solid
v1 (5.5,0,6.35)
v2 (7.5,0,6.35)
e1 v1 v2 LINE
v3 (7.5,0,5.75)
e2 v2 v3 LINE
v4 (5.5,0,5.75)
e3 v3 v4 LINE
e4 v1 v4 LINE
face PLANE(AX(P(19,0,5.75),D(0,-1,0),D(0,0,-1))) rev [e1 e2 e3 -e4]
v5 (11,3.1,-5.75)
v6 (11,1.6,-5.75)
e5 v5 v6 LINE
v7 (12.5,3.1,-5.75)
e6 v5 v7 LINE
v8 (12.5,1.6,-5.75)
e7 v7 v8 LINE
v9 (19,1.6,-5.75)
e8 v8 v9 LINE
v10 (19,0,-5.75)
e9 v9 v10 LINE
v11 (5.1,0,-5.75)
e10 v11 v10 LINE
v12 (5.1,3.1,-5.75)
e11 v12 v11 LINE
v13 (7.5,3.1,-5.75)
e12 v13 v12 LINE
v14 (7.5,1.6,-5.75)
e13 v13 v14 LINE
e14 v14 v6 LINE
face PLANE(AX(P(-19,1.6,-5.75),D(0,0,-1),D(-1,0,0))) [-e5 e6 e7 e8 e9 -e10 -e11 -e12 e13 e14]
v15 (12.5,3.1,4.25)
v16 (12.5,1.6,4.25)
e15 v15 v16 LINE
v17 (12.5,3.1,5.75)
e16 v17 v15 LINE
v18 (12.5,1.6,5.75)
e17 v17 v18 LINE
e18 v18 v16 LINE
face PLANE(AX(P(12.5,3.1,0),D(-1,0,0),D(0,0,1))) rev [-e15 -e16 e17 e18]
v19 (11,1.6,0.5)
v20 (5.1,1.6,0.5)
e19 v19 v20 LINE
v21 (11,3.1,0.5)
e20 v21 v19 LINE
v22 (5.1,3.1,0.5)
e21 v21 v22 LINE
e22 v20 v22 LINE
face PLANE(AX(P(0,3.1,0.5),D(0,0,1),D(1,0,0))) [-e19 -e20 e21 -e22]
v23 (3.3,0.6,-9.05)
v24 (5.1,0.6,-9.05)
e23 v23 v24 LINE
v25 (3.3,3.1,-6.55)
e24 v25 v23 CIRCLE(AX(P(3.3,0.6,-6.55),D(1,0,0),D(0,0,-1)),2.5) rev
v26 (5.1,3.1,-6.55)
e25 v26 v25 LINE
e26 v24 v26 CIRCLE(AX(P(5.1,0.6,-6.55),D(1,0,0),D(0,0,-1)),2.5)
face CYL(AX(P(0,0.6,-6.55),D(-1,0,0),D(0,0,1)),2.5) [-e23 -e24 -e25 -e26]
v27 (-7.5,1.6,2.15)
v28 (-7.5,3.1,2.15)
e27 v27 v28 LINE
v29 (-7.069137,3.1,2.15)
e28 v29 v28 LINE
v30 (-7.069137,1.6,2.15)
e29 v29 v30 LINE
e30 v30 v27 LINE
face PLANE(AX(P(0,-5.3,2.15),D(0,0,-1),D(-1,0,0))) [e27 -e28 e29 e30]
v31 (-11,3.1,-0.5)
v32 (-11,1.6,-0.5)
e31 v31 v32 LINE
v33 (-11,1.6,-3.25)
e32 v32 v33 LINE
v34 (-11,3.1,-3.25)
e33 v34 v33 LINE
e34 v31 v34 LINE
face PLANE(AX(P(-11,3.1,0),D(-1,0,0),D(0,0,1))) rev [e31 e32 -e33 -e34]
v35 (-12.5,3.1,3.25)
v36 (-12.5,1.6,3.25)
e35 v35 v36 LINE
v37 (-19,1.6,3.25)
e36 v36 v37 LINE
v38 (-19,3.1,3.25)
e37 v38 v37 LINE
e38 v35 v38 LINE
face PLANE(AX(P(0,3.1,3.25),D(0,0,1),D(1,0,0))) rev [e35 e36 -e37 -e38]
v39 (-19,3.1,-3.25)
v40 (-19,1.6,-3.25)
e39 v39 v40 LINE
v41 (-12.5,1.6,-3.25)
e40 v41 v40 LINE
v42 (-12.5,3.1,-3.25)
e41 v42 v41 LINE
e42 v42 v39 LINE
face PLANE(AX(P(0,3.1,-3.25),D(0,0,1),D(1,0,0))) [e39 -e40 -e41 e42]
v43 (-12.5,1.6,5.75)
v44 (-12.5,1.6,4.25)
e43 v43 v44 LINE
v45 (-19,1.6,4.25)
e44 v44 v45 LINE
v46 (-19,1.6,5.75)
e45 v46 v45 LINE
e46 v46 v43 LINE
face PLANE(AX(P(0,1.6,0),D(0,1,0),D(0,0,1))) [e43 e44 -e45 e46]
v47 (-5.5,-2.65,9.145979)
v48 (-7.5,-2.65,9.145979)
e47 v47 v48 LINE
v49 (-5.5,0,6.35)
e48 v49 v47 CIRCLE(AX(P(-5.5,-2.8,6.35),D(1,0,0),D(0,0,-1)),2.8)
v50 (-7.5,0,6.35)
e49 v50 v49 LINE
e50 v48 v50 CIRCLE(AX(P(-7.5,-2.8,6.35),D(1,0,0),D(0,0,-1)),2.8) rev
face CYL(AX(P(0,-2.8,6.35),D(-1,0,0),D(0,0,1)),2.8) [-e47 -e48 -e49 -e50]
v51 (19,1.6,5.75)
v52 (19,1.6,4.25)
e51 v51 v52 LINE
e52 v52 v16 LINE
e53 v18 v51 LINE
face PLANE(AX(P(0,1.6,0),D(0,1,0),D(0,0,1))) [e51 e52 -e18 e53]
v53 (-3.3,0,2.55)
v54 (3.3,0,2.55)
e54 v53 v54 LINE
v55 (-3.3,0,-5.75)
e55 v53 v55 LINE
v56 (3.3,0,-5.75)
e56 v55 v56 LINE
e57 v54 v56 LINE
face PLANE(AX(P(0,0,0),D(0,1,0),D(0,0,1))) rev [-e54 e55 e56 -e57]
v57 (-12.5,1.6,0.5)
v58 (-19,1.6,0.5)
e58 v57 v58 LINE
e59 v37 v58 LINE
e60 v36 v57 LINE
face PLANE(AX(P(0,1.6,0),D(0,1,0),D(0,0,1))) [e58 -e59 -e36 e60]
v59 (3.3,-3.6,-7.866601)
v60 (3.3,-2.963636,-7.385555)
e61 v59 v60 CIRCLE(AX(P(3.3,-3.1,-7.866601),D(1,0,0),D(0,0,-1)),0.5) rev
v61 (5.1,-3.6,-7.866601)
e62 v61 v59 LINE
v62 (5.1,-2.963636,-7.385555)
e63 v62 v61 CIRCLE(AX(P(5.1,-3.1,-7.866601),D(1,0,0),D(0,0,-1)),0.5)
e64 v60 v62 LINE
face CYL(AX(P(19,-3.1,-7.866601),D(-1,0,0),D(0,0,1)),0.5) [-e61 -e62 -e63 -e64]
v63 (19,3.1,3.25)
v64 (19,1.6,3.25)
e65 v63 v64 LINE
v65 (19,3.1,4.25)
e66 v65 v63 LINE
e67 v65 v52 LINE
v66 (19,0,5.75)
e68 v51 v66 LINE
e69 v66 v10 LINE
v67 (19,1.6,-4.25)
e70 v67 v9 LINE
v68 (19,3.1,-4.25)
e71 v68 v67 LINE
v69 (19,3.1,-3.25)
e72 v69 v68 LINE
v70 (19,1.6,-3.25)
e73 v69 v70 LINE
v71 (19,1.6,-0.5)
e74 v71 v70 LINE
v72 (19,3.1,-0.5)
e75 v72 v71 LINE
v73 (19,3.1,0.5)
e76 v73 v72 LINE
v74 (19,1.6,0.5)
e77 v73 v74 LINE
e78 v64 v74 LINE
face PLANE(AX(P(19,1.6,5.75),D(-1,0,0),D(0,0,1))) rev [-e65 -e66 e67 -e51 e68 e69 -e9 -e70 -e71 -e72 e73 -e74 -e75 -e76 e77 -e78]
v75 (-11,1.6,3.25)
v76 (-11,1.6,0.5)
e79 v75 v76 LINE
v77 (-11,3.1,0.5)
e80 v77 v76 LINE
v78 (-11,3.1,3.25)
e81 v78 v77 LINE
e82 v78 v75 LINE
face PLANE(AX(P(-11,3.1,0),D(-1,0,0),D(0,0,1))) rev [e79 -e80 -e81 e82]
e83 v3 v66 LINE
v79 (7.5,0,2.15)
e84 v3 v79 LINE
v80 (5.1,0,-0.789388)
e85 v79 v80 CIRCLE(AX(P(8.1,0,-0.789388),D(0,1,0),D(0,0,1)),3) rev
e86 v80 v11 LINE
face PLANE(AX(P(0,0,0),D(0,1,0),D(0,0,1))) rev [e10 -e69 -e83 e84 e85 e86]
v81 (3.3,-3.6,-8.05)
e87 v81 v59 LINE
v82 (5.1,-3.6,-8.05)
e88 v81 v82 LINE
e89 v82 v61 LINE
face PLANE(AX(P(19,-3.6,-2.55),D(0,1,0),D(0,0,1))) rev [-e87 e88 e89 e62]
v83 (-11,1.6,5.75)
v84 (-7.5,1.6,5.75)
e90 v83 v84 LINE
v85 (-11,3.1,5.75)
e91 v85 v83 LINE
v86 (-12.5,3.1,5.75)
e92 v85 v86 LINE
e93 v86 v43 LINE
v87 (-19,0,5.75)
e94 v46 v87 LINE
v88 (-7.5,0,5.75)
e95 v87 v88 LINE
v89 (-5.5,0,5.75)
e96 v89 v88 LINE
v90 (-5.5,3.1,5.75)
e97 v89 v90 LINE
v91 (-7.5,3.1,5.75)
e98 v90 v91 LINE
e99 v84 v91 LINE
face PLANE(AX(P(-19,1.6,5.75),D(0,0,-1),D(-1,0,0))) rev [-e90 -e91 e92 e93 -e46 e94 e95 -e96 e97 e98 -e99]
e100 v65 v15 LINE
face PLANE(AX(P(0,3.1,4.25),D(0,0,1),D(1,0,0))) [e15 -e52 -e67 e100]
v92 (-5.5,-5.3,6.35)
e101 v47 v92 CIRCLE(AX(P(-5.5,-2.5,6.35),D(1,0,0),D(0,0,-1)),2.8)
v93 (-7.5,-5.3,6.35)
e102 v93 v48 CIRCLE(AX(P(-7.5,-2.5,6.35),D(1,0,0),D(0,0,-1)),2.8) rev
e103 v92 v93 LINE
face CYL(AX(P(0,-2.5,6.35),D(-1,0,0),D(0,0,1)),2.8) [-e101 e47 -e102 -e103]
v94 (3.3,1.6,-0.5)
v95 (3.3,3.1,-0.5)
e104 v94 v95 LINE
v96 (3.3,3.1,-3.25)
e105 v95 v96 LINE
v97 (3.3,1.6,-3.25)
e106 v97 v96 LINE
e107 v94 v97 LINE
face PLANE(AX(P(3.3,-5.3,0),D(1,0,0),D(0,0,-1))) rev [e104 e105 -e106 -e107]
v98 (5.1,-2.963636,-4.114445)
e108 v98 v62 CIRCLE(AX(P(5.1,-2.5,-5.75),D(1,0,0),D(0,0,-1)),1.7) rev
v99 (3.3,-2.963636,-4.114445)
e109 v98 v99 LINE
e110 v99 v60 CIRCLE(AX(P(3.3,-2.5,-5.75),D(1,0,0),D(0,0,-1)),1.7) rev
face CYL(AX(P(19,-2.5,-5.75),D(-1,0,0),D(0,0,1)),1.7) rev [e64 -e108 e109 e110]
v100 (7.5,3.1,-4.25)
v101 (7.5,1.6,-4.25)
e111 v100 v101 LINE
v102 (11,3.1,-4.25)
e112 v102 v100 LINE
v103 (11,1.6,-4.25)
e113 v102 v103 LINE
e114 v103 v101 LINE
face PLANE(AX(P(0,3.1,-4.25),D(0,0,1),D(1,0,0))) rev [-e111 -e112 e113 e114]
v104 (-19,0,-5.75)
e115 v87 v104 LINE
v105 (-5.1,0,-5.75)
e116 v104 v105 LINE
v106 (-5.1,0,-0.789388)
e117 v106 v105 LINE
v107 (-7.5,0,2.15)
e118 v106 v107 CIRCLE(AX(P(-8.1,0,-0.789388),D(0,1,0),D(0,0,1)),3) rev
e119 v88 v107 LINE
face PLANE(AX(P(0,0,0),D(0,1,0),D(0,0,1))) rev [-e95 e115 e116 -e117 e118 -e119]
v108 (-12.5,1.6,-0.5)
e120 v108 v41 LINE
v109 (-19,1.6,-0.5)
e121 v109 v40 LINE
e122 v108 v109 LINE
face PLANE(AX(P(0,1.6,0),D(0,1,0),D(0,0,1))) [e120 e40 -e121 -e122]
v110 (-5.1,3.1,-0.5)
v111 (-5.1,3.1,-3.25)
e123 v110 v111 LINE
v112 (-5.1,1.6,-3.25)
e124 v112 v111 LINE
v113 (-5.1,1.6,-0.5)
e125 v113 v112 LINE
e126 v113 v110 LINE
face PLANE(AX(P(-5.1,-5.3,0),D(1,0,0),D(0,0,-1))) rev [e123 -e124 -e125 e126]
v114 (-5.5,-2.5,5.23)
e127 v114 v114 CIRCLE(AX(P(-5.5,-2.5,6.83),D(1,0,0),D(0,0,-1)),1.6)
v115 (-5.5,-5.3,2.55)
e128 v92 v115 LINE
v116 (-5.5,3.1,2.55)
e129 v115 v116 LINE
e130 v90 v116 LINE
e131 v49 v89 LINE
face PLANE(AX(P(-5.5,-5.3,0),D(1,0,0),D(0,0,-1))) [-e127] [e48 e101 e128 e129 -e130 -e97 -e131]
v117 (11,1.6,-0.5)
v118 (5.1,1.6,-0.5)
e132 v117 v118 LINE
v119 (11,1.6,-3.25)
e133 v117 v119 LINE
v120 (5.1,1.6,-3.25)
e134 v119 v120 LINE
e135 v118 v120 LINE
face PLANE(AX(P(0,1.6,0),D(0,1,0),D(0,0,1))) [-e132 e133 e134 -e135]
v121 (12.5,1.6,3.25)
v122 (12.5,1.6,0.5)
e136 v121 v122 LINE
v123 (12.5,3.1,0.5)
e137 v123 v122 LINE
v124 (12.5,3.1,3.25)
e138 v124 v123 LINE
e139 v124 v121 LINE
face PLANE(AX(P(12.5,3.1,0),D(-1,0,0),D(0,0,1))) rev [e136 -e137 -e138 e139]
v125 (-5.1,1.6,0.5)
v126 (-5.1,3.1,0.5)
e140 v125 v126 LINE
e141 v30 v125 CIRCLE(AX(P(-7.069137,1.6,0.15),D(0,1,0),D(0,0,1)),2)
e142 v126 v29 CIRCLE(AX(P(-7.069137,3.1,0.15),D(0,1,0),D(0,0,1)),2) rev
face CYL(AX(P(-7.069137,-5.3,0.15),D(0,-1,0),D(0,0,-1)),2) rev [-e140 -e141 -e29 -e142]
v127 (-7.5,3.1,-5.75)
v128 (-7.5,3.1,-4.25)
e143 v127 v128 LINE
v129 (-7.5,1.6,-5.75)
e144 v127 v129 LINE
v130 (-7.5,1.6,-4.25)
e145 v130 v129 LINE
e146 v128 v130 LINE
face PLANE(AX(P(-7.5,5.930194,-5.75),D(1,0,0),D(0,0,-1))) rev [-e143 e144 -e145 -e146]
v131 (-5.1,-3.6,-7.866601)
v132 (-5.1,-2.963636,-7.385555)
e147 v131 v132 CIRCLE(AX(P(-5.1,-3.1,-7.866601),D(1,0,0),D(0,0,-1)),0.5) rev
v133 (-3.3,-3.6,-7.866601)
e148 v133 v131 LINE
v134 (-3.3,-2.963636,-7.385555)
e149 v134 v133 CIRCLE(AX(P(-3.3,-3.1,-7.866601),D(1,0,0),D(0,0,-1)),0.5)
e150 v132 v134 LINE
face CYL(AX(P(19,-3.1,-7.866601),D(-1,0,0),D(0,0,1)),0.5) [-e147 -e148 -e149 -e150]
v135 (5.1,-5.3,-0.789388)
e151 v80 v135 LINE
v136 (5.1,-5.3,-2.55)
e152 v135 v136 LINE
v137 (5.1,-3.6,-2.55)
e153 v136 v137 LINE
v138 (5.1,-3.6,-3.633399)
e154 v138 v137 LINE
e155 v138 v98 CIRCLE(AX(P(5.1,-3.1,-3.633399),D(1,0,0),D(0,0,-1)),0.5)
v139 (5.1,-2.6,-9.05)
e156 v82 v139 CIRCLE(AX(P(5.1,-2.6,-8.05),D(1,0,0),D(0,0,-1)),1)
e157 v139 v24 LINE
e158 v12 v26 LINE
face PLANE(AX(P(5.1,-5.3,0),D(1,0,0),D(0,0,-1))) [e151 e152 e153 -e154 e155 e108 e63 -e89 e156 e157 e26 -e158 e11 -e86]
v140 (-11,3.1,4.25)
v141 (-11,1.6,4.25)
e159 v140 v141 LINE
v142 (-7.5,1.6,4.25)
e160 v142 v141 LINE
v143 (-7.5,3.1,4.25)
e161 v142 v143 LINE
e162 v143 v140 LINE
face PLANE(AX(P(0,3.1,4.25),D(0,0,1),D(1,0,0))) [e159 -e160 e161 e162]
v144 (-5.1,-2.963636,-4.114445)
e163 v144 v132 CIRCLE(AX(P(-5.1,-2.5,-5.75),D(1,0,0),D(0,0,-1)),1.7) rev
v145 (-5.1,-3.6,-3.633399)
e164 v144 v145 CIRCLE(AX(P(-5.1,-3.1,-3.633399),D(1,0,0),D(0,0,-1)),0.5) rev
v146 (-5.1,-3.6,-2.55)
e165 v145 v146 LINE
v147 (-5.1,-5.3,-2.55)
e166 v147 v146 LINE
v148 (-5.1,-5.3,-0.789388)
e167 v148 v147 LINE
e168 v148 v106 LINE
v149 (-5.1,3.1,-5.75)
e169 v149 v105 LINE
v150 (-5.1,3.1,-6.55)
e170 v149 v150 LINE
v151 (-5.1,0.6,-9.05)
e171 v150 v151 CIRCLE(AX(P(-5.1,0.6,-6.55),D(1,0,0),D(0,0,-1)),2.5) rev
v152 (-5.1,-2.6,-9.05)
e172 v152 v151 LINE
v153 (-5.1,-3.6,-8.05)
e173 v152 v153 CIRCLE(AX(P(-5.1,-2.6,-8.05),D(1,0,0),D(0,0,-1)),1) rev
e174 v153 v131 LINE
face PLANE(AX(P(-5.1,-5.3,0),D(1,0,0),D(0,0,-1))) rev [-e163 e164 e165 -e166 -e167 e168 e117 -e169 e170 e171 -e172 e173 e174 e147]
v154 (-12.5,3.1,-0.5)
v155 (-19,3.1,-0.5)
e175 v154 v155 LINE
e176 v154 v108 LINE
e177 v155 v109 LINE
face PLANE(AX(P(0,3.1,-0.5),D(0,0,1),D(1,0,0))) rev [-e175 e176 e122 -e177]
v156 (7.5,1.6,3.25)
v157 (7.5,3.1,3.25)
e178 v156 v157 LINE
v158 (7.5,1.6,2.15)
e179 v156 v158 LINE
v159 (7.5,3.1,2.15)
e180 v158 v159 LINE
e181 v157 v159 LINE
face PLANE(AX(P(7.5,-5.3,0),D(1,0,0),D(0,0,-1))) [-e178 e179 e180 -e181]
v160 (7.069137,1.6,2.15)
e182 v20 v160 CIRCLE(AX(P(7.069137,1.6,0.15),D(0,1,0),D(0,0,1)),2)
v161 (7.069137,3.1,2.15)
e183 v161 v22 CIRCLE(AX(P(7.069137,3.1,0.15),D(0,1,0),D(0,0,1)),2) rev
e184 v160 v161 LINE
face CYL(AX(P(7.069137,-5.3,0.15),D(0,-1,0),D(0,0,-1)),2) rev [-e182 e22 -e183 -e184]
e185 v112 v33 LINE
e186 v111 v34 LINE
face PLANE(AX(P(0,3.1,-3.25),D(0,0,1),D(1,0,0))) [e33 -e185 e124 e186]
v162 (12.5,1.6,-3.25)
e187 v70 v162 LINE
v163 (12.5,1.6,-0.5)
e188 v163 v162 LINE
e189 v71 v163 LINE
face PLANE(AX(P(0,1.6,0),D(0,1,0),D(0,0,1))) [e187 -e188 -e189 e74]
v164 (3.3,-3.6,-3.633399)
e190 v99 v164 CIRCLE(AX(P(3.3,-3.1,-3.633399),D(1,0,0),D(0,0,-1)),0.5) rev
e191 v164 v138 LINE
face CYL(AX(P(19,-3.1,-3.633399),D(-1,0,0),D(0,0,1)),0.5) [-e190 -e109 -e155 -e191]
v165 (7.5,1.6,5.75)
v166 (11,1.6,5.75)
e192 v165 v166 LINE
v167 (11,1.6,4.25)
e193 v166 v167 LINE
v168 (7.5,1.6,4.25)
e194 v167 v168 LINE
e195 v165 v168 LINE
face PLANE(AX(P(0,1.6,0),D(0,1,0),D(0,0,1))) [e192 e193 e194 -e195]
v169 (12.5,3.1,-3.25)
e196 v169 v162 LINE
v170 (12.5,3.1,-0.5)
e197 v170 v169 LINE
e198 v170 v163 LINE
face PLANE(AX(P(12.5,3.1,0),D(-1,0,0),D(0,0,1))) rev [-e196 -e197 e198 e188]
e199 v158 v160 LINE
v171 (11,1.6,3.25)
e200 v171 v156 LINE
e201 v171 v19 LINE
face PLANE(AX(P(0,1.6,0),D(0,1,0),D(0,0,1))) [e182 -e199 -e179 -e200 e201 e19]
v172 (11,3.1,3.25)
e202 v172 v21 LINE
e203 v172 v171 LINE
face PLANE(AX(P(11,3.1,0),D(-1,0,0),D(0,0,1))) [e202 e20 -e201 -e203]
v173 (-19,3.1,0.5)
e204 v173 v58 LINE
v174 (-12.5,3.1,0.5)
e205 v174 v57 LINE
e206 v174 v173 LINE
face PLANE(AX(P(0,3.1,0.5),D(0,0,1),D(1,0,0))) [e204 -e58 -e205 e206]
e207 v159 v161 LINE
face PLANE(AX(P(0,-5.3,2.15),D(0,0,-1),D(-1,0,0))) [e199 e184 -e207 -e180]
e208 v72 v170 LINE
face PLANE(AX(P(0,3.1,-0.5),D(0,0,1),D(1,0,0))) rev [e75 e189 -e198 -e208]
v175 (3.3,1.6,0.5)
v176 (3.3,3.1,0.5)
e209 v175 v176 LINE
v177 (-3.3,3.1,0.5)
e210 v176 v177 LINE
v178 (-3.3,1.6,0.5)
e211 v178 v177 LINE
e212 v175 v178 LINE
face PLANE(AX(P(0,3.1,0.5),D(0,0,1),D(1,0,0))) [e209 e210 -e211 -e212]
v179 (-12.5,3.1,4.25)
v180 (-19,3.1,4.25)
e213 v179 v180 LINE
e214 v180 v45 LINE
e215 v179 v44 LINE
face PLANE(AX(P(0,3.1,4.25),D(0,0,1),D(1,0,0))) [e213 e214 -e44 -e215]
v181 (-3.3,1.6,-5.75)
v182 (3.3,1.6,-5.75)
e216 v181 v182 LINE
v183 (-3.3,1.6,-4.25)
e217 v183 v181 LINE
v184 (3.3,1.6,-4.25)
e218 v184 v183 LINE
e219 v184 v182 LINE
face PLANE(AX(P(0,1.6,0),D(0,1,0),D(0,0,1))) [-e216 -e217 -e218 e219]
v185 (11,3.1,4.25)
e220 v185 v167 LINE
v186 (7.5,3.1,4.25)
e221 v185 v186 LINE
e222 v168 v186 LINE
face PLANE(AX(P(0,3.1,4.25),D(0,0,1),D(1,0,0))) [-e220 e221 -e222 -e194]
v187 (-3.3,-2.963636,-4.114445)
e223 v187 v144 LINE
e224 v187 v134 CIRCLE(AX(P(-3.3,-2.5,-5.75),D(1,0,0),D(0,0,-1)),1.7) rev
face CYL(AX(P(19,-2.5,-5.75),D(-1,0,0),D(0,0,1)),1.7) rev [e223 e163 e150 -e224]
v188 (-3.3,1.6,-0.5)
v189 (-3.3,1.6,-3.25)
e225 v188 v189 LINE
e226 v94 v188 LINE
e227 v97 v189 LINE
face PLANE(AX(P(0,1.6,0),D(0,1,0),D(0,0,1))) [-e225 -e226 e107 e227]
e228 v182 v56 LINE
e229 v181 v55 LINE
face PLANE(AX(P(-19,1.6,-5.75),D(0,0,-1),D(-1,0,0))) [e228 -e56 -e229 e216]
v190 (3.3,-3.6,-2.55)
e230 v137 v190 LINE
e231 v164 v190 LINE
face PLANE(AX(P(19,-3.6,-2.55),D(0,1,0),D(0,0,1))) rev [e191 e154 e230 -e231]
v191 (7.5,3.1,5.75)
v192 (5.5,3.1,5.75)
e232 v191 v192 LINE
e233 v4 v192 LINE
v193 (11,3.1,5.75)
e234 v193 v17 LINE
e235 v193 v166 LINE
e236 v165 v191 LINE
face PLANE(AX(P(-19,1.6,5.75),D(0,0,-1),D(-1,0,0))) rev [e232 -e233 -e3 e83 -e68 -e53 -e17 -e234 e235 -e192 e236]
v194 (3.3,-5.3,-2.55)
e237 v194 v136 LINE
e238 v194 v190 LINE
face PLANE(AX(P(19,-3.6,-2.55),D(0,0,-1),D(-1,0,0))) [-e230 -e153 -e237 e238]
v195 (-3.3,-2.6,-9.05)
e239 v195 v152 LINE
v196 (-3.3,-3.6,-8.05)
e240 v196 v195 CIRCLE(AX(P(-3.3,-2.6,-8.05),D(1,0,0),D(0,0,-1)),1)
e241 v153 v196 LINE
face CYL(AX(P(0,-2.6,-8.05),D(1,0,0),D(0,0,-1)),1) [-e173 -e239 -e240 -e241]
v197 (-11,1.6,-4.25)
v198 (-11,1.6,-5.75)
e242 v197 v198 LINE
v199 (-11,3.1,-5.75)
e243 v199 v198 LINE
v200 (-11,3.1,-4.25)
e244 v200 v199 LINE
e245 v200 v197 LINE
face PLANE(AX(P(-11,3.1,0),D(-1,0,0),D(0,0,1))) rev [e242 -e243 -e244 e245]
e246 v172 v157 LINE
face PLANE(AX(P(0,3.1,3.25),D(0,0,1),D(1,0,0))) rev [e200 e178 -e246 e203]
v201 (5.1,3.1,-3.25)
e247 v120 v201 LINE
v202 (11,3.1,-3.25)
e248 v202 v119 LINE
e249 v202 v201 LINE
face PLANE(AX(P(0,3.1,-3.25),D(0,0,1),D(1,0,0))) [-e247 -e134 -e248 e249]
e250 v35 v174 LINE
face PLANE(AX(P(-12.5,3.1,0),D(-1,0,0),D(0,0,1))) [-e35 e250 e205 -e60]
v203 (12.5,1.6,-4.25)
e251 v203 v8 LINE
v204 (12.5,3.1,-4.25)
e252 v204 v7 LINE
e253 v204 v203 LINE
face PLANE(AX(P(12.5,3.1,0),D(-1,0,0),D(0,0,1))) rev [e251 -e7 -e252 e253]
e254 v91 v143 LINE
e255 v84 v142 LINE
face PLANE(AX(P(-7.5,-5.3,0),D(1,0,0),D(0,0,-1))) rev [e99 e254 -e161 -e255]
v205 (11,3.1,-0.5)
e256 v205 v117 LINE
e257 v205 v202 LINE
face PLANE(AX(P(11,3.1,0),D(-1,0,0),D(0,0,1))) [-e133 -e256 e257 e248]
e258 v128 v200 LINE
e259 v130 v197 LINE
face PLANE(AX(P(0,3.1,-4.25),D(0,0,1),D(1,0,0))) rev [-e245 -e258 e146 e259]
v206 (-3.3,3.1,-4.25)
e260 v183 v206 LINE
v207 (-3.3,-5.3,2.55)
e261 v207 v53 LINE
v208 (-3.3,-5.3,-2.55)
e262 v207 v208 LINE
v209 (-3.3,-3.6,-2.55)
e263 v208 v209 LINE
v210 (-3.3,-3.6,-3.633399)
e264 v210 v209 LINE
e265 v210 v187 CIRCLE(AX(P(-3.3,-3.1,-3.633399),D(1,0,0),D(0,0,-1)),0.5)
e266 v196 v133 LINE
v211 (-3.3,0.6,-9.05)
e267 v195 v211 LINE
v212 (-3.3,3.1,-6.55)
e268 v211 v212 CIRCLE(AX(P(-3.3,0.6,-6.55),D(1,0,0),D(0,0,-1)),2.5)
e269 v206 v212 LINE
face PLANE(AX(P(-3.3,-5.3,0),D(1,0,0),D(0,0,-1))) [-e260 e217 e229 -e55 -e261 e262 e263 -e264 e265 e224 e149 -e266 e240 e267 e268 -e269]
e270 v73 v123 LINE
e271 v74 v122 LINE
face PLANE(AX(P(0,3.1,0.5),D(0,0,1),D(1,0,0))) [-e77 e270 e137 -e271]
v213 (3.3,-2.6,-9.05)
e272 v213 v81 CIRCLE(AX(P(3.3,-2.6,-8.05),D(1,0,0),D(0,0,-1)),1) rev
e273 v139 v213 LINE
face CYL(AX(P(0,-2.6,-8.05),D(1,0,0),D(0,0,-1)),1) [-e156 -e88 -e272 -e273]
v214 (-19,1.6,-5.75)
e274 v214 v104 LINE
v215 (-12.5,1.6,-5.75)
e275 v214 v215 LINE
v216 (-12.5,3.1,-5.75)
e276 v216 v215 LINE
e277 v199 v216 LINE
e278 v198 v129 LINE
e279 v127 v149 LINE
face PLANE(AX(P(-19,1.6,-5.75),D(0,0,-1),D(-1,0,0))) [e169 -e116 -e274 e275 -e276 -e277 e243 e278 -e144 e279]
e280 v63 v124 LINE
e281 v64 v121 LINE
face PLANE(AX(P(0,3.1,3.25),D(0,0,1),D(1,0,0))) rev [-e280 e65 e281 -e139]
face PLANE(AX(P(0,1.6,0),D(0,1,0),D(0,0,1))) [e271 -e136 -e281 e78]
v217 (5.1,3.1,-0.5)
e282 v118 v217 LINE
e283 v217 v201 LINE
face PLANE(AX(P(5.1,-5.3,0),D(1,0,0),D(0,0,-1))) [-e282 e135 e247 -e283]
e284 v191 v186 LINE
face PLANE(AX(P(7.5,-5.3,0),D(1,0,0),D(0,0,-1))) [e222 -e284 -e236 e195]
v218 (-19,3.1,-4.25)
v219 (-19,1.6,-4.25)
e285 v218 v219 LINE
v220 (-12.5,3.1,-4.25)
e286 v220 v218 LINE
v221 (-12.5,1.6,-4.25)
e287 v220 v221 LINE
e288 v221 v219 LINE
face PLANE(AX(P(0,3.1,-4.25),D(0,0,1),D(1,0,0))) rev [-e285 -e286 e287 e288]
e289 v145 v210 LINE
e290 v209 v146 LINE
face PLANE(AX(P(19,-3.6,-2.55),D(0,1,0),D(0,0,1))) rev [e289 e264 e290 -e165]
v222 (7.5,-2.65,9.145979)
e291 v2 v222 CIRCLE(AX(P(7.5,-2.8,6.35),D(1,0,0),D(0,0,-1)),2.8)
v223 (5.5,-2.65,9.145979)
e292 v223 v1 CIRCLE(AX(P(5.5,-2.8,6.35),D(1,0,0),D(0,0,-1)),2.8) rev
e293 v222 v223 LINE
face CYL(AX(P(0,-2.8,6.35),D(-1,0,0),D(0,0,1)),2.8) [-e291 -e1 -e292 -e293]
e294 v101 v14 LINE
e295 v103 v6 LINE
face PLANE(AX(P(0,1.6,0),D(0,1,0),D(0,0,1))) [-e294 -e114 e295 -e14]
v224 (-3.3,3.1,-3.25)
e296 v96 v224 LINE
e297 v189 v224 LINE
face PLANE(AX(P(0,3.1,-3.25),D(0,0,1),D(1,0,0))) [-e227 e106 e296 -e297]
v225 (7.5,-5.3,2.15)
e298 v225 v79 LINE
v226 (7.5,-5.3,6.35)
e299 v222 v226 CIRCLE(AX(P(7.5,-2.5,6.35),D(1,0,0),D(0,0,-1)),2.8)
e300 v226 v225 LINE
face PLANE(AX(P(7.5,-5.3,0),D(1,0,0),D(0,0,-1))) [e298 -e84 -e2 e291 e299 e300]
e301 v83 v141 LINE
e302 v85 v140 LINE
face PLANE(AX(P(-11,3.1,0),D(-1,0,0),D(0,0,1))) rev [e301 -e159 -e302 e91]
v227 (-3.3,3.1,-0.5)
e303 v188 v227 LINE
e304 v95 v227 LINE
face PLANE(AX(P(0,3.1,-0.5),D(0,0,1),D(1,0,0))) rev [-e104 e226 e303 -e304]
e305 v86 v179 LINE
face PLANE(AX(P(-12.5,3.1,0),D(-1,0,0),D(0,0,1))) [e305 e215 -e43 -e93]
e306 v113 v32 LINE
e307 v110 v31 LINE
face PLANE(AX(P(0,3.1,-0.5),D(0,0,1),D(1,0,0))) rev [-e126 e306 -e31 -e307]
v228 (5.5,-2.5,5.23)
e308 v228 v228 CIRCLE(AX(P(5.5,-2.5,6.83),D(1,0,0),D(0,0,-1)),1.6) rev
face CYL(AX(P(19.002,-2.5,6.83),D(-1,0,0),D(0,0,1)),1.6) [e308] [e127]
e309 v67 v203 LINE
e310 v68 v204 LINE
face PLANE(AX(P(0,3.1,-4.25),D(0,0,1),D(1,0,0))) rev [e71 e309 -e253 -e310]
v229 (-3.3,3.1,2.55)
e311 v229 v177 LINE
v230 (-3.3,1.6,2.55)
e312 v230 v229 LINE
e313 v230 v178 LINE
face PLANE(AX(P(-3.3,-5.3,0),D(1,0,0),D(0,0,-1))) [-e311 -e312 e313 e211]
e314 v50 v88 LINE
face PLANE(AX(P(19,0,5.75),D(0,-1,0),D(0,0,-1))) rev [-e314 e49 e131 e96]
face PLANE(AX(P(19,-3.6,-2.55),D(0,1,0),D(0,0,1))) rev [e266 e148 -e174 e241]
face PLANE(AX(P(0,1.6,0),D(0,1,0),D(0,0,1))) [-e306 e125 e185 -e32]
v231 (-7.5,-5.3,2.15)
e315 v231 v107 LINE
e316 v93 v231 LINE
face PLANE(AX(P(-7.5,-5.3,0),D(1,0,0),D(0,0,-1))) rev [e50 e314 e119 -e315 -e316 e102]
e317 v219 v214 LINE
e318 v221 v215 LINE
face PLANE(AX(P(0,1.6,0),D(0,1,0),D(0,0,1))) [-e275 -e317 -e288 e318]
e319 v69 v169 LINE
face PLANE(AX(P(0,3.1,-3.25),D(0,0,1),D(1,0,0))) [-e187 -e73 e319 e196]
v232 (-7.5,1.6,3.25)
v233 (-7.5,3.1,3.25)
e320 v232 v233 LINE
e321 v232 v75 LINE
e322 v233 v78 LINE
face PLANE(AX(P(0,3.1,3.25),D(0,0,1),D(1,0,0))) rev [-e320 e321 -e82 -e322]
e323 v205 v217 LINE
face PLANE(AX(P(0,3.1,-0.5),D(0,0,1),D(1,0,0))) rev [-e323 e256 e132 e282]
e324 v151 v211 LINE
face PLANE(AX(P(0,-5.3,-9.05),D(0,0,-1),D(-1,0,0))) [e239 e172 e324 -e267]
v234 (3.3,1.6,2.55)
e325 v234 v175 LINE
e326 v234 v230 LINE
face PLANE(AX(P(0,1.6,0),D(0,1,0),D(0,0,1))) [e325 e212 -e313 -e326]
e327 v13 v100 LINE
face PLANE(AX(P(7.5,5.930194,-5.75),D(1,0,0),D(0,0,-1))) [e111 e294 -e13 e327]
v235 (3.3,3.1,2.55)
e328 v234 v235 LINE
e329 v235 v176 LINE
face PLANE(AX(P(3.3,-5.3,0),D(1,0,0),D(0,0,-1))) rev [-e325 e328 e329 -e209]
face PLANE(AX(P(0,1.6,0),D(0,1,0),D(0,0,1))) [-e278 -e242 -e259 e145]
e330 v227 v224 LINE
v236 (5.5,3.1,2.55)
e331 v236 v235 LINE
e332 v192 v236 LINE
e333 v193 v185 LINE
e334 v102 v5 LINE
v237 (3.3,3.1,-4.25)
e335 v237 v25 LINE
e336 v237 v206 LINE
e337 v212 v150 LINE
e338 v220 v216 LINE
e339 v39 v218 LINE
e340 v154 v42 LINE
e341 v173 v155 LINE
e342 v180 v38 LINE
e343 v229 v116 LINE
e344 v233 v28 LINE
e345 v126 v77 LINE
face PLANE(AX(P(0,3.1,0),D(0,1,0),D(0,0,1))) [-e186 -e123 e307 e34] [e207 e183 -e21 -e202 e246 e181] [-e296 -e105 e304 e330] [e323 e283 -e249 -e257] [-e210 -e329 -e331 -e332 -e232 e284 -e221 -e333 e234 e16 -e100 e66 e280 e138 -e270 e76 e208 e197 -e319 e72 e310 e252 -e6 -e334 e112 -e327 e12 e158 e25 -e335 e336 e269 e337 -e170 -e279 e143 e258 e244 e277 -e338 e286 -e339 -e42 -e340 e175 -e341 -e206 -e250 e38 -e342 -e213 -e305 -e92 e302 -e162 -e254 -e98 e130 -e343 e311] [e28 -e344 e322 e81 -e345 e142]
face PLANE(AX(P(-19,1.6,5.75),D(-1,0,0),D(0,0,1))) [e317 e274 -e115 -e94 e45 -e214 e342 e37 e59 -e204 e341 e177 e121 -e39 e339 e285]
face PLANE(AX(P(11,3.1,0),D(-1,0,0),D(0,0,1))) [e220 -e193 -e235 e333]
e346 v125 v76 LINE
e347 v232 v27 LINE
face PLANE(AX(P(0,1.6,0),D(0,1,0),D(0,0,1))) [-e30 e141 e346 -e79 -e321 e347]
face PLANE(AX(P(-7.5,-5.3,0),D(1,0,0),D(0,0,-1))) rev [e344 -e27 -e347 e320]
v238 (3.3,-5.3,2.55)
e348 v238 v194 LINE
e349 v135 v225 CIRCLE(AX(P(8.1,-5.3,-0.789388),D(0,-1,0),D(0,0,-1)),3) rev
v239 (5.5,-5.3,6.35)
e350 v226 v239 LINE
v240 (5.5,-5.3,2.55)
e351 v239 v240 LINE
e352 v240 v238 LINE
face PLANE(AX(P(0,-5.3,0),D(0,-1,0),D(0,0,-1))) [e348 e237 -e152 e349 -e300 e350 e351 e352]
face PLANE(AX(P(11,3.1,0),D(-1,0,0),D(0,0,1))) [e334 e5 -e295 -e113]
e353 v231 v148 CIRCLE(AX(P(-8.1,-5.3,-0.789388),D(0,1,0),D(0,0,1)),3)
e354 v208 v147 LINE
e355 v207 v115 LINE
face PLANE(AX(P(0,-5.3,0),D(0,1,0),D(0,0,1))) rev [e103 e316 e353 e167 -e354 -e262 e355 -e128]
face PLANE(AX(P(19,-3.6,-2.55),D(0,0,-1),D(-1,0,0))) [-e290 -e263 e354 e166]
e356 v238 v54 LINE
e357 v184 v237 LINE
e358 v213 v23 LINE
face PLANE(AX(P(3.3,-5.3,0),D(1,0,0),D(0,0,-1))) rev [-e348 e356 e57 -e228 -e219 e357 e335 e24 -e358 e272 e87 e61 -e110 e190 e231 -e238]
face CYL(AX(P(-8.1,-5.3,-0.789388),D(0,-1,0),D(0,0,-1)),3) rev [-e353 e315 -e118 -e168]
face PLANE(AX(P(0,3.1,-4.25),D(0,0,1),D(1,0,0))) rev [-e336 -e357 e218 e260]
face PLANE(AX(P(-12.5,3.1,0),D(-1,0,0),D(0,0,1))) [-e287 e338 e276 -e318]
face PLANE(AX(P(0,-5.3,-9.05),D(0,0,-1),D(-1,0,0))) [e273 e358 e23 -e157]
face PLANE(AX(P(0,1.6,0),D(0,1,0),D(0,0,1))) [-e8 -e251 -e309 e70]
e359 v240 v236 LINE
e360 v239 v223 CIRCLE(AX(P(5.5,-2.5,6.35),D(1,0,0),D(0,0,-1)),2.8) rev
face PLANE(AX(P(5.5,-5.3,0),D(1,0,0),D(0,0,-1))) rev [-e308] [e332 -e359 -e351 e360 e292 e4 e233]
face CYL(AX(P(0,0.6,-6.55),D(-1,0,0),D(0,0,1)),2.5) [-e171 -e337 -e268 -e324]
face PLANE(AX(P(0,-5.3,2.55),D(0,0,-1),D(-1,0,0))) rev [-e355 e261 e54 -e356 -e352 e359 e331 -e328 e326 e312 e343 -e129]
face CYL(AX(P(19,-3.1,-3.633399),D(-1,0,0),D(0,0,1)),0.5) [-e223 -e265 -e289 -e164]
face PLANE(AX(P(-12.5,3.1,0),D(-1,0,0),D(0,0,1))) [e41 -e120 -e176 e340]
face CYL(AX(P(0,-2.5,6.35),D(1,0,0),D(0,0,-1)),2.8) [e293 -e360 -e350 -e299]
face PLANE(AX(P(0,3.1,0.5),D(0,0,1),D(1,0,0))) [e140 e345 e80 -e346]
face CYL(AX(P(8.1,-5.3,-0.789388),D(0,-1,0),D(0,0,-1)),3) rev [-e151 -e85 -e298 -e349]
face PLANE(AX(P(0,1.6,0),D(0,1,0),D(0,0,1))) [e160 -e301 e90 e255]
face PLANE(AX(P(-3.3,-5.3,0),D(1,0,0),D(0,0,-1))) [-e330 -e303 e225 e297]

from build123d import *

# Parameters (mm, degrees)
SKETCH_1_W               = 38
SKETCH_1_H               = 11.5
EXTRUDE_1_DEPTH          = 1.6
EXTRUDE_START            = 1.6
SKETCH_1_3_W             = 38
SKETCH_1_3_H             = 1
SKETCH_1_3_W_2           = 1.5
SKETCH_1_3_H_2           = 11.5
EXTRUDE_2_DEPTH          = 1.5
EXTRUDE_START_2          = 3.1
EXTRUDE_3_DEPTH          = 8.4
SKETCH_2_4_W             = 2.4
SKETCH_2_4_H             = 1.5
EXTRUDE_5_DEPTH          = 3.1
CUT_EXTRUDE_1_DEPTH      = 22.744252114
FILLET_1_R               = 3
EXTRUDE_4_REACH          = 28.684
SKETCH_3_R               = 1.6
CUT_EXTRUDE_2_DEPTH      = 27.684499246
CUT_EXTRUDE_2_DEPTH_BACK = 27.684499246
SKETCH_3_3_R             = 1.7
SKETCH_3_3_W             = 6.5
SKETCH_3_3_H             = 1.7
SKETCH_3_3_W_2           = 3.4
SKETCH_3_3_H_2           = 3.1
FILLET_2_R               = 2.8
FILLET_3_R               = 2.5
FILLET_4_R               = 1
FILLET_5_R               = 0.5
FILLET_6_R               = 2


with BuildPart() as part:
    # 草图1 → 凸台-拉伸1 (new body)
    with BuildSketch(Plane(origin=(0, 0, 0), x_dir=(1, 0, 0), z_dir=(0, 1, 0))):
        Rectangle(SKETCH_1_W, SKETCH_1_H)
    extrude(amount=EXTRUDE_1_DEPTH)

    # 草图1<3> → 凸台-拉伸2 (add)
    with BuildSketch(Plane(origin=(0, 0, 0), x_dir=(1, 0, 0), z_dir=(0, 1, 0)).offset(EXTRUDE_START)):
        with Locations((0, 3.75)):
            Rectangle(SKETCH_1_3_W, SKETCH_1_3_H)
        Rectangle(SKETCH_1_3_W, SKETCH_1_3_H)
        with Locations((0, -3.75)):
            Rectangle(SKETCH_1_3_W, SKETCH_1_3_H)
        with Locations((-11.75, 0)):
            Rectangle(SKETCH_1_3_W_2, SKETCH_1_3_H_2)
        with Locations((11.75, 0)):
            Rectangle(SKETCH_1_3_W_2, SKETCH_1_3_H_2)
    extrude(amount=EXTRUDE_2_DEPTH)

    # 草图2 → 凸台-拉伸3 (add)
    with BuildSketch(Plane(origin=(0, 0, 0), x_dir=(1, 0, 0), z_dir=(0, 1, 0)).offset(EXTRUDE_START_2)):
        Polygon((-3.3, 9.05), (-5.1, 9.05), (-5.1, -2.15), (-7.5, -2.15), (-7.5, -9.15), (-5.5, -9.15), (-5.5, -2.55), (-3.3, -2.55), align=None)
        Polygon((5.1, 9.05), (3.3, 9.05), (3.3, -2.55), (5.5, -2.55), (5.5, -9.15), (7.5, -9.15), (7.5, -2.15), (5.1, -2.15), align=None)
    extrude(amount=-EXTRUDE_3_DEPTH)

    # 草图2<4> → 凸台-拉伸5 (add)
    with BuildSketch(Plane(origin=(0, 0, 0), x_dir=(1, 0, 0), z_dir=(0, 1, 0))):
        with Locations((-6.3, 5)):
            Rectangle(SKETCH_2_4_W, SKETCH_2_4_H)
        with Locations((6.3, 5)):
            Rectangle(SKETCH_2_4_W, SKETCH_2_4_H)
    extrude(amount=EXTRUDE_5_DEPTH)

    # 草图2<3> → 切除-拉伸1 (cut, through all)
    with BuildSketch(Plane(origin=(0, 0, 0), x_dir=(1, 0, 0), z_dir=(0, 1, 0))):
        Polygon((0, -9.15), (0, -2.55), (-3.3, -2.55), (-5.1, -2.55), (-5.5, -2.55), (-5.5, -9.15), align=None)
        Polygon((3.3, -2.55), (0, -2.55), (0, -9.15), (5.5, -9.15), (5.5, -2.55), (5.1, -2.55), align=None)
    extrude(amount=CUT_EXTRUDE_1_DEPTH, mode=Mode.SUBTRACT)

    # 圆角1
    # the kernel refuses this fillet: 3 mm, written as the material it adds along each edge
    with BuildSketch(Plane(origin=(5.1, 7.348469228, 2.15), x_dir=(0, 0, -1), z_dir=(0, -1, 0))) as fillet_1_piece_1_section:
        with BuildLine():
            CenterArc((2.939387691, 3), FILLET_1_R, 191.536959033, 78.463040967)
            Line((0, 2.4), (0, 0))
            Line((0, 0), (2.939387691, 0))
        make_face()
    fillet_1_piece_1 = extrude(amount=12.648469228, mode=Mode.PRIVATE)
    fillet_1_piece_1 = split(fillet_1_piece_1, bisect_by=Plane(origin=(5.102900281, 1.6, -0.644495887), z_dir=(0, -1, 0)), keep=Keep.TOP, mode=Mode.PRIVATE)
    add(fillet_1_piece_1)
    with BuildSketch(Plane(origin=(-5.1, 0, 2.15), x_dir=(0, 0, -1), z_dir=(0, -1, 0))) as fillet_1_piece_2:
        with BuildLine():
            CenterArc((2.939387691, -3), FILLET_1_R, 90, 78.463040967)
            Line((0, -2.4), (0, 0))
            Line((0, 0), (2.939387691, 0))
        make_face()
    extrude(amount=5.3)

    # 草图3 → 凸台-拉伸4 (add, up to next)
    with BuildSketch(Plane(origin=(-5.5, 0, 0), x_dir=(0, 0, -1), z_dir=(1, 0, 0)), mode=Mode.PRIVATE) as extrude_4_sk1:
        with Locations((-6.83, -2.5)):
            Circle(SKETCH_3_R)
    extrude_4_tool1 = extrude(extrude_4_sk1.sketch, amount=EXTRUDE_4_REACH, mode=Mode.PRIVATE) - part.part
    add(extrude_4_tool1.solids().sort_by_distance((-5.5, -2.5, 6.83))[0])

    # 草图3<3> → 切除-拉伸2 (cut, two sides: drawn at the far end of the back side and taken through both)
    with BuildSketch(Plane(origin=(-5.5, 0, 0), x_dir=(0, 0, -1), z_dir=(1, 0, 0)).offset(-CUT_EXTRUDE_2_DEPTH_BACK)):
        with Locations((5.75, -2.5)):
            Circle(SKETCH_3_3_R)
        with Locations((5.8, -4.45)):
            Rectangle(SKETCH_3_3_W, SKETCH_3_3_H)
        with Locations((-7.45, 1.55)):
            Rectangle(SKETCH_3_3_W_2, SKETCH_3_3_H_2)
    extrude(amount=CUT_EXTRUDE_2_DEPTH + CUT_EXTRUDE_2_DEPTH_BACK, mode=Mode.SUBTRACT)

    # 圆角2
    # the kernel refuses this fillet: 2.8 mm, written as the material it takes off along each edge
    with BuildSketch(Plane(origin=(-1.5, 0, 9.15), x_dir=(0, 0, -1), z_dir=(1, 0, 0)), Plane(origin=(-14.5, 0, 9.15), x_dir=(0, 0, -1), z_dir=(1, 0, 0))) as fillet_2_piece_1:
        with BuildLine():
            CenterArc((FILLET_2_R, -FILLET_2_R), FILLET_2_R, 90, 90)
            Line((0, -FILLET_2_R), (0, 0))
            Line((0, 0), (FILLET_2_R, 0))
        make_face()
    extrude(amount=16, mode=Mode.SUBTRACT)
    with BuildSketch(Plane(origin=(-1.5, -5.3, 9.15), x_dir=(0, 0, -1), z_dir=(1, 0, 0)), Plane(origin=(-14.5, -5.3, 9.15), x_dir=(0, 0, -1), z_dir=(1, 0, 0))) as fillet_2_piece_2:
        with BuildLine():
            CenterArc((FILLET_2_R, FILLET_2_R), FILLET_2_R, 180, 90)
            Line((0, FILLET_2_R), (0, 0))
            Line((0, 0), (FILLET_2_R, 0))
        make_face()
    extrude(amount=16, mode=Mode.SUBTRACT)

    # 圆角3
    fillet_3_edges = [part.edges().sort_by_distance(p)[0] for p in [
        (-4.2, 3.1, -9.05),
        (4.2, 3.1, -9.05),
    ]]
    fillet(fillet_3_edges, radius=FILLET_3_R)

    # 圆角4
    fillet_4_edges = [part.edges().sort_by_distance(p)[0] for p in [
        (-4.2, -3.6, -9.05),
        (4.2, -3.6, -9.05),
    ]]
    fillet(fillet_4_edges, radius=FILLET_4_R)

    # 圆角5
    fillet_5_edges = [part.edges().sort_by_distance(p)[0] for p in [
        (-4.2, -3.6, -4.45385186),
        (4.2, -3.6, -4.45385186),
        (-4.2, -3.6, -7.04614814),
        (4.2, -3.6, -7.04614814),
    ]]
    fillet(fillet_5_edges, radius=FILLET_5_R)

    # 圆角6
    # the kernel refuses this fillet: 2 mm, written as the material it adds along each edge
    with BuildSketch(Plane(origin=(5.1, 3.1, 2.15), x_dir=(0, 0, -1), z_dir=(0, -1, 0))) as fillet_6_piece_1:
        with BuildLine():
            CenterArc((2, 1.969136867), FILLET_6_R, 180, 79.921341892)
            Line((0, 1.969136867), (-0.04, 1.969136867))
            Line((-0.04, 1.969136867), (-0.04, 0))
            Line((-0.04, 0), (0, -0.04))
            ThreePointArc((0, -0.04), (0.825, -0.04), (1.643, -0.039382737))
            Line((1.643, -0.039382737), (1.65, 0))
        make_face()
    extrude(amount=6.422842167)
    with BuildSketch(Plane(origin=(-5.1, 3.1, 2.15), x_dir=(-1, 0, 0), z_dir=(0, -1, 0))) as fillet_6_piece_2:
        with BuildLine():
            CenterArc((1.969136867, 2), FILLET_6_R, 190.078658108, 79.921341892)
            Line((0, 1.65), (-0.039382737, 1.643))
            ThreePointArc((-0.039382737, 1.643), (-0.04, 0.825), (-0.04, 0))
            Line((-0.04, 0), (0, -0.04))
            Line((0, -0.04), (1.969136867, -0.04))
            Line((1.969136867, -0.04), (1.969136867, 0))
        make_face()
    extrude(amount=6.422842167)


solid = part.part
